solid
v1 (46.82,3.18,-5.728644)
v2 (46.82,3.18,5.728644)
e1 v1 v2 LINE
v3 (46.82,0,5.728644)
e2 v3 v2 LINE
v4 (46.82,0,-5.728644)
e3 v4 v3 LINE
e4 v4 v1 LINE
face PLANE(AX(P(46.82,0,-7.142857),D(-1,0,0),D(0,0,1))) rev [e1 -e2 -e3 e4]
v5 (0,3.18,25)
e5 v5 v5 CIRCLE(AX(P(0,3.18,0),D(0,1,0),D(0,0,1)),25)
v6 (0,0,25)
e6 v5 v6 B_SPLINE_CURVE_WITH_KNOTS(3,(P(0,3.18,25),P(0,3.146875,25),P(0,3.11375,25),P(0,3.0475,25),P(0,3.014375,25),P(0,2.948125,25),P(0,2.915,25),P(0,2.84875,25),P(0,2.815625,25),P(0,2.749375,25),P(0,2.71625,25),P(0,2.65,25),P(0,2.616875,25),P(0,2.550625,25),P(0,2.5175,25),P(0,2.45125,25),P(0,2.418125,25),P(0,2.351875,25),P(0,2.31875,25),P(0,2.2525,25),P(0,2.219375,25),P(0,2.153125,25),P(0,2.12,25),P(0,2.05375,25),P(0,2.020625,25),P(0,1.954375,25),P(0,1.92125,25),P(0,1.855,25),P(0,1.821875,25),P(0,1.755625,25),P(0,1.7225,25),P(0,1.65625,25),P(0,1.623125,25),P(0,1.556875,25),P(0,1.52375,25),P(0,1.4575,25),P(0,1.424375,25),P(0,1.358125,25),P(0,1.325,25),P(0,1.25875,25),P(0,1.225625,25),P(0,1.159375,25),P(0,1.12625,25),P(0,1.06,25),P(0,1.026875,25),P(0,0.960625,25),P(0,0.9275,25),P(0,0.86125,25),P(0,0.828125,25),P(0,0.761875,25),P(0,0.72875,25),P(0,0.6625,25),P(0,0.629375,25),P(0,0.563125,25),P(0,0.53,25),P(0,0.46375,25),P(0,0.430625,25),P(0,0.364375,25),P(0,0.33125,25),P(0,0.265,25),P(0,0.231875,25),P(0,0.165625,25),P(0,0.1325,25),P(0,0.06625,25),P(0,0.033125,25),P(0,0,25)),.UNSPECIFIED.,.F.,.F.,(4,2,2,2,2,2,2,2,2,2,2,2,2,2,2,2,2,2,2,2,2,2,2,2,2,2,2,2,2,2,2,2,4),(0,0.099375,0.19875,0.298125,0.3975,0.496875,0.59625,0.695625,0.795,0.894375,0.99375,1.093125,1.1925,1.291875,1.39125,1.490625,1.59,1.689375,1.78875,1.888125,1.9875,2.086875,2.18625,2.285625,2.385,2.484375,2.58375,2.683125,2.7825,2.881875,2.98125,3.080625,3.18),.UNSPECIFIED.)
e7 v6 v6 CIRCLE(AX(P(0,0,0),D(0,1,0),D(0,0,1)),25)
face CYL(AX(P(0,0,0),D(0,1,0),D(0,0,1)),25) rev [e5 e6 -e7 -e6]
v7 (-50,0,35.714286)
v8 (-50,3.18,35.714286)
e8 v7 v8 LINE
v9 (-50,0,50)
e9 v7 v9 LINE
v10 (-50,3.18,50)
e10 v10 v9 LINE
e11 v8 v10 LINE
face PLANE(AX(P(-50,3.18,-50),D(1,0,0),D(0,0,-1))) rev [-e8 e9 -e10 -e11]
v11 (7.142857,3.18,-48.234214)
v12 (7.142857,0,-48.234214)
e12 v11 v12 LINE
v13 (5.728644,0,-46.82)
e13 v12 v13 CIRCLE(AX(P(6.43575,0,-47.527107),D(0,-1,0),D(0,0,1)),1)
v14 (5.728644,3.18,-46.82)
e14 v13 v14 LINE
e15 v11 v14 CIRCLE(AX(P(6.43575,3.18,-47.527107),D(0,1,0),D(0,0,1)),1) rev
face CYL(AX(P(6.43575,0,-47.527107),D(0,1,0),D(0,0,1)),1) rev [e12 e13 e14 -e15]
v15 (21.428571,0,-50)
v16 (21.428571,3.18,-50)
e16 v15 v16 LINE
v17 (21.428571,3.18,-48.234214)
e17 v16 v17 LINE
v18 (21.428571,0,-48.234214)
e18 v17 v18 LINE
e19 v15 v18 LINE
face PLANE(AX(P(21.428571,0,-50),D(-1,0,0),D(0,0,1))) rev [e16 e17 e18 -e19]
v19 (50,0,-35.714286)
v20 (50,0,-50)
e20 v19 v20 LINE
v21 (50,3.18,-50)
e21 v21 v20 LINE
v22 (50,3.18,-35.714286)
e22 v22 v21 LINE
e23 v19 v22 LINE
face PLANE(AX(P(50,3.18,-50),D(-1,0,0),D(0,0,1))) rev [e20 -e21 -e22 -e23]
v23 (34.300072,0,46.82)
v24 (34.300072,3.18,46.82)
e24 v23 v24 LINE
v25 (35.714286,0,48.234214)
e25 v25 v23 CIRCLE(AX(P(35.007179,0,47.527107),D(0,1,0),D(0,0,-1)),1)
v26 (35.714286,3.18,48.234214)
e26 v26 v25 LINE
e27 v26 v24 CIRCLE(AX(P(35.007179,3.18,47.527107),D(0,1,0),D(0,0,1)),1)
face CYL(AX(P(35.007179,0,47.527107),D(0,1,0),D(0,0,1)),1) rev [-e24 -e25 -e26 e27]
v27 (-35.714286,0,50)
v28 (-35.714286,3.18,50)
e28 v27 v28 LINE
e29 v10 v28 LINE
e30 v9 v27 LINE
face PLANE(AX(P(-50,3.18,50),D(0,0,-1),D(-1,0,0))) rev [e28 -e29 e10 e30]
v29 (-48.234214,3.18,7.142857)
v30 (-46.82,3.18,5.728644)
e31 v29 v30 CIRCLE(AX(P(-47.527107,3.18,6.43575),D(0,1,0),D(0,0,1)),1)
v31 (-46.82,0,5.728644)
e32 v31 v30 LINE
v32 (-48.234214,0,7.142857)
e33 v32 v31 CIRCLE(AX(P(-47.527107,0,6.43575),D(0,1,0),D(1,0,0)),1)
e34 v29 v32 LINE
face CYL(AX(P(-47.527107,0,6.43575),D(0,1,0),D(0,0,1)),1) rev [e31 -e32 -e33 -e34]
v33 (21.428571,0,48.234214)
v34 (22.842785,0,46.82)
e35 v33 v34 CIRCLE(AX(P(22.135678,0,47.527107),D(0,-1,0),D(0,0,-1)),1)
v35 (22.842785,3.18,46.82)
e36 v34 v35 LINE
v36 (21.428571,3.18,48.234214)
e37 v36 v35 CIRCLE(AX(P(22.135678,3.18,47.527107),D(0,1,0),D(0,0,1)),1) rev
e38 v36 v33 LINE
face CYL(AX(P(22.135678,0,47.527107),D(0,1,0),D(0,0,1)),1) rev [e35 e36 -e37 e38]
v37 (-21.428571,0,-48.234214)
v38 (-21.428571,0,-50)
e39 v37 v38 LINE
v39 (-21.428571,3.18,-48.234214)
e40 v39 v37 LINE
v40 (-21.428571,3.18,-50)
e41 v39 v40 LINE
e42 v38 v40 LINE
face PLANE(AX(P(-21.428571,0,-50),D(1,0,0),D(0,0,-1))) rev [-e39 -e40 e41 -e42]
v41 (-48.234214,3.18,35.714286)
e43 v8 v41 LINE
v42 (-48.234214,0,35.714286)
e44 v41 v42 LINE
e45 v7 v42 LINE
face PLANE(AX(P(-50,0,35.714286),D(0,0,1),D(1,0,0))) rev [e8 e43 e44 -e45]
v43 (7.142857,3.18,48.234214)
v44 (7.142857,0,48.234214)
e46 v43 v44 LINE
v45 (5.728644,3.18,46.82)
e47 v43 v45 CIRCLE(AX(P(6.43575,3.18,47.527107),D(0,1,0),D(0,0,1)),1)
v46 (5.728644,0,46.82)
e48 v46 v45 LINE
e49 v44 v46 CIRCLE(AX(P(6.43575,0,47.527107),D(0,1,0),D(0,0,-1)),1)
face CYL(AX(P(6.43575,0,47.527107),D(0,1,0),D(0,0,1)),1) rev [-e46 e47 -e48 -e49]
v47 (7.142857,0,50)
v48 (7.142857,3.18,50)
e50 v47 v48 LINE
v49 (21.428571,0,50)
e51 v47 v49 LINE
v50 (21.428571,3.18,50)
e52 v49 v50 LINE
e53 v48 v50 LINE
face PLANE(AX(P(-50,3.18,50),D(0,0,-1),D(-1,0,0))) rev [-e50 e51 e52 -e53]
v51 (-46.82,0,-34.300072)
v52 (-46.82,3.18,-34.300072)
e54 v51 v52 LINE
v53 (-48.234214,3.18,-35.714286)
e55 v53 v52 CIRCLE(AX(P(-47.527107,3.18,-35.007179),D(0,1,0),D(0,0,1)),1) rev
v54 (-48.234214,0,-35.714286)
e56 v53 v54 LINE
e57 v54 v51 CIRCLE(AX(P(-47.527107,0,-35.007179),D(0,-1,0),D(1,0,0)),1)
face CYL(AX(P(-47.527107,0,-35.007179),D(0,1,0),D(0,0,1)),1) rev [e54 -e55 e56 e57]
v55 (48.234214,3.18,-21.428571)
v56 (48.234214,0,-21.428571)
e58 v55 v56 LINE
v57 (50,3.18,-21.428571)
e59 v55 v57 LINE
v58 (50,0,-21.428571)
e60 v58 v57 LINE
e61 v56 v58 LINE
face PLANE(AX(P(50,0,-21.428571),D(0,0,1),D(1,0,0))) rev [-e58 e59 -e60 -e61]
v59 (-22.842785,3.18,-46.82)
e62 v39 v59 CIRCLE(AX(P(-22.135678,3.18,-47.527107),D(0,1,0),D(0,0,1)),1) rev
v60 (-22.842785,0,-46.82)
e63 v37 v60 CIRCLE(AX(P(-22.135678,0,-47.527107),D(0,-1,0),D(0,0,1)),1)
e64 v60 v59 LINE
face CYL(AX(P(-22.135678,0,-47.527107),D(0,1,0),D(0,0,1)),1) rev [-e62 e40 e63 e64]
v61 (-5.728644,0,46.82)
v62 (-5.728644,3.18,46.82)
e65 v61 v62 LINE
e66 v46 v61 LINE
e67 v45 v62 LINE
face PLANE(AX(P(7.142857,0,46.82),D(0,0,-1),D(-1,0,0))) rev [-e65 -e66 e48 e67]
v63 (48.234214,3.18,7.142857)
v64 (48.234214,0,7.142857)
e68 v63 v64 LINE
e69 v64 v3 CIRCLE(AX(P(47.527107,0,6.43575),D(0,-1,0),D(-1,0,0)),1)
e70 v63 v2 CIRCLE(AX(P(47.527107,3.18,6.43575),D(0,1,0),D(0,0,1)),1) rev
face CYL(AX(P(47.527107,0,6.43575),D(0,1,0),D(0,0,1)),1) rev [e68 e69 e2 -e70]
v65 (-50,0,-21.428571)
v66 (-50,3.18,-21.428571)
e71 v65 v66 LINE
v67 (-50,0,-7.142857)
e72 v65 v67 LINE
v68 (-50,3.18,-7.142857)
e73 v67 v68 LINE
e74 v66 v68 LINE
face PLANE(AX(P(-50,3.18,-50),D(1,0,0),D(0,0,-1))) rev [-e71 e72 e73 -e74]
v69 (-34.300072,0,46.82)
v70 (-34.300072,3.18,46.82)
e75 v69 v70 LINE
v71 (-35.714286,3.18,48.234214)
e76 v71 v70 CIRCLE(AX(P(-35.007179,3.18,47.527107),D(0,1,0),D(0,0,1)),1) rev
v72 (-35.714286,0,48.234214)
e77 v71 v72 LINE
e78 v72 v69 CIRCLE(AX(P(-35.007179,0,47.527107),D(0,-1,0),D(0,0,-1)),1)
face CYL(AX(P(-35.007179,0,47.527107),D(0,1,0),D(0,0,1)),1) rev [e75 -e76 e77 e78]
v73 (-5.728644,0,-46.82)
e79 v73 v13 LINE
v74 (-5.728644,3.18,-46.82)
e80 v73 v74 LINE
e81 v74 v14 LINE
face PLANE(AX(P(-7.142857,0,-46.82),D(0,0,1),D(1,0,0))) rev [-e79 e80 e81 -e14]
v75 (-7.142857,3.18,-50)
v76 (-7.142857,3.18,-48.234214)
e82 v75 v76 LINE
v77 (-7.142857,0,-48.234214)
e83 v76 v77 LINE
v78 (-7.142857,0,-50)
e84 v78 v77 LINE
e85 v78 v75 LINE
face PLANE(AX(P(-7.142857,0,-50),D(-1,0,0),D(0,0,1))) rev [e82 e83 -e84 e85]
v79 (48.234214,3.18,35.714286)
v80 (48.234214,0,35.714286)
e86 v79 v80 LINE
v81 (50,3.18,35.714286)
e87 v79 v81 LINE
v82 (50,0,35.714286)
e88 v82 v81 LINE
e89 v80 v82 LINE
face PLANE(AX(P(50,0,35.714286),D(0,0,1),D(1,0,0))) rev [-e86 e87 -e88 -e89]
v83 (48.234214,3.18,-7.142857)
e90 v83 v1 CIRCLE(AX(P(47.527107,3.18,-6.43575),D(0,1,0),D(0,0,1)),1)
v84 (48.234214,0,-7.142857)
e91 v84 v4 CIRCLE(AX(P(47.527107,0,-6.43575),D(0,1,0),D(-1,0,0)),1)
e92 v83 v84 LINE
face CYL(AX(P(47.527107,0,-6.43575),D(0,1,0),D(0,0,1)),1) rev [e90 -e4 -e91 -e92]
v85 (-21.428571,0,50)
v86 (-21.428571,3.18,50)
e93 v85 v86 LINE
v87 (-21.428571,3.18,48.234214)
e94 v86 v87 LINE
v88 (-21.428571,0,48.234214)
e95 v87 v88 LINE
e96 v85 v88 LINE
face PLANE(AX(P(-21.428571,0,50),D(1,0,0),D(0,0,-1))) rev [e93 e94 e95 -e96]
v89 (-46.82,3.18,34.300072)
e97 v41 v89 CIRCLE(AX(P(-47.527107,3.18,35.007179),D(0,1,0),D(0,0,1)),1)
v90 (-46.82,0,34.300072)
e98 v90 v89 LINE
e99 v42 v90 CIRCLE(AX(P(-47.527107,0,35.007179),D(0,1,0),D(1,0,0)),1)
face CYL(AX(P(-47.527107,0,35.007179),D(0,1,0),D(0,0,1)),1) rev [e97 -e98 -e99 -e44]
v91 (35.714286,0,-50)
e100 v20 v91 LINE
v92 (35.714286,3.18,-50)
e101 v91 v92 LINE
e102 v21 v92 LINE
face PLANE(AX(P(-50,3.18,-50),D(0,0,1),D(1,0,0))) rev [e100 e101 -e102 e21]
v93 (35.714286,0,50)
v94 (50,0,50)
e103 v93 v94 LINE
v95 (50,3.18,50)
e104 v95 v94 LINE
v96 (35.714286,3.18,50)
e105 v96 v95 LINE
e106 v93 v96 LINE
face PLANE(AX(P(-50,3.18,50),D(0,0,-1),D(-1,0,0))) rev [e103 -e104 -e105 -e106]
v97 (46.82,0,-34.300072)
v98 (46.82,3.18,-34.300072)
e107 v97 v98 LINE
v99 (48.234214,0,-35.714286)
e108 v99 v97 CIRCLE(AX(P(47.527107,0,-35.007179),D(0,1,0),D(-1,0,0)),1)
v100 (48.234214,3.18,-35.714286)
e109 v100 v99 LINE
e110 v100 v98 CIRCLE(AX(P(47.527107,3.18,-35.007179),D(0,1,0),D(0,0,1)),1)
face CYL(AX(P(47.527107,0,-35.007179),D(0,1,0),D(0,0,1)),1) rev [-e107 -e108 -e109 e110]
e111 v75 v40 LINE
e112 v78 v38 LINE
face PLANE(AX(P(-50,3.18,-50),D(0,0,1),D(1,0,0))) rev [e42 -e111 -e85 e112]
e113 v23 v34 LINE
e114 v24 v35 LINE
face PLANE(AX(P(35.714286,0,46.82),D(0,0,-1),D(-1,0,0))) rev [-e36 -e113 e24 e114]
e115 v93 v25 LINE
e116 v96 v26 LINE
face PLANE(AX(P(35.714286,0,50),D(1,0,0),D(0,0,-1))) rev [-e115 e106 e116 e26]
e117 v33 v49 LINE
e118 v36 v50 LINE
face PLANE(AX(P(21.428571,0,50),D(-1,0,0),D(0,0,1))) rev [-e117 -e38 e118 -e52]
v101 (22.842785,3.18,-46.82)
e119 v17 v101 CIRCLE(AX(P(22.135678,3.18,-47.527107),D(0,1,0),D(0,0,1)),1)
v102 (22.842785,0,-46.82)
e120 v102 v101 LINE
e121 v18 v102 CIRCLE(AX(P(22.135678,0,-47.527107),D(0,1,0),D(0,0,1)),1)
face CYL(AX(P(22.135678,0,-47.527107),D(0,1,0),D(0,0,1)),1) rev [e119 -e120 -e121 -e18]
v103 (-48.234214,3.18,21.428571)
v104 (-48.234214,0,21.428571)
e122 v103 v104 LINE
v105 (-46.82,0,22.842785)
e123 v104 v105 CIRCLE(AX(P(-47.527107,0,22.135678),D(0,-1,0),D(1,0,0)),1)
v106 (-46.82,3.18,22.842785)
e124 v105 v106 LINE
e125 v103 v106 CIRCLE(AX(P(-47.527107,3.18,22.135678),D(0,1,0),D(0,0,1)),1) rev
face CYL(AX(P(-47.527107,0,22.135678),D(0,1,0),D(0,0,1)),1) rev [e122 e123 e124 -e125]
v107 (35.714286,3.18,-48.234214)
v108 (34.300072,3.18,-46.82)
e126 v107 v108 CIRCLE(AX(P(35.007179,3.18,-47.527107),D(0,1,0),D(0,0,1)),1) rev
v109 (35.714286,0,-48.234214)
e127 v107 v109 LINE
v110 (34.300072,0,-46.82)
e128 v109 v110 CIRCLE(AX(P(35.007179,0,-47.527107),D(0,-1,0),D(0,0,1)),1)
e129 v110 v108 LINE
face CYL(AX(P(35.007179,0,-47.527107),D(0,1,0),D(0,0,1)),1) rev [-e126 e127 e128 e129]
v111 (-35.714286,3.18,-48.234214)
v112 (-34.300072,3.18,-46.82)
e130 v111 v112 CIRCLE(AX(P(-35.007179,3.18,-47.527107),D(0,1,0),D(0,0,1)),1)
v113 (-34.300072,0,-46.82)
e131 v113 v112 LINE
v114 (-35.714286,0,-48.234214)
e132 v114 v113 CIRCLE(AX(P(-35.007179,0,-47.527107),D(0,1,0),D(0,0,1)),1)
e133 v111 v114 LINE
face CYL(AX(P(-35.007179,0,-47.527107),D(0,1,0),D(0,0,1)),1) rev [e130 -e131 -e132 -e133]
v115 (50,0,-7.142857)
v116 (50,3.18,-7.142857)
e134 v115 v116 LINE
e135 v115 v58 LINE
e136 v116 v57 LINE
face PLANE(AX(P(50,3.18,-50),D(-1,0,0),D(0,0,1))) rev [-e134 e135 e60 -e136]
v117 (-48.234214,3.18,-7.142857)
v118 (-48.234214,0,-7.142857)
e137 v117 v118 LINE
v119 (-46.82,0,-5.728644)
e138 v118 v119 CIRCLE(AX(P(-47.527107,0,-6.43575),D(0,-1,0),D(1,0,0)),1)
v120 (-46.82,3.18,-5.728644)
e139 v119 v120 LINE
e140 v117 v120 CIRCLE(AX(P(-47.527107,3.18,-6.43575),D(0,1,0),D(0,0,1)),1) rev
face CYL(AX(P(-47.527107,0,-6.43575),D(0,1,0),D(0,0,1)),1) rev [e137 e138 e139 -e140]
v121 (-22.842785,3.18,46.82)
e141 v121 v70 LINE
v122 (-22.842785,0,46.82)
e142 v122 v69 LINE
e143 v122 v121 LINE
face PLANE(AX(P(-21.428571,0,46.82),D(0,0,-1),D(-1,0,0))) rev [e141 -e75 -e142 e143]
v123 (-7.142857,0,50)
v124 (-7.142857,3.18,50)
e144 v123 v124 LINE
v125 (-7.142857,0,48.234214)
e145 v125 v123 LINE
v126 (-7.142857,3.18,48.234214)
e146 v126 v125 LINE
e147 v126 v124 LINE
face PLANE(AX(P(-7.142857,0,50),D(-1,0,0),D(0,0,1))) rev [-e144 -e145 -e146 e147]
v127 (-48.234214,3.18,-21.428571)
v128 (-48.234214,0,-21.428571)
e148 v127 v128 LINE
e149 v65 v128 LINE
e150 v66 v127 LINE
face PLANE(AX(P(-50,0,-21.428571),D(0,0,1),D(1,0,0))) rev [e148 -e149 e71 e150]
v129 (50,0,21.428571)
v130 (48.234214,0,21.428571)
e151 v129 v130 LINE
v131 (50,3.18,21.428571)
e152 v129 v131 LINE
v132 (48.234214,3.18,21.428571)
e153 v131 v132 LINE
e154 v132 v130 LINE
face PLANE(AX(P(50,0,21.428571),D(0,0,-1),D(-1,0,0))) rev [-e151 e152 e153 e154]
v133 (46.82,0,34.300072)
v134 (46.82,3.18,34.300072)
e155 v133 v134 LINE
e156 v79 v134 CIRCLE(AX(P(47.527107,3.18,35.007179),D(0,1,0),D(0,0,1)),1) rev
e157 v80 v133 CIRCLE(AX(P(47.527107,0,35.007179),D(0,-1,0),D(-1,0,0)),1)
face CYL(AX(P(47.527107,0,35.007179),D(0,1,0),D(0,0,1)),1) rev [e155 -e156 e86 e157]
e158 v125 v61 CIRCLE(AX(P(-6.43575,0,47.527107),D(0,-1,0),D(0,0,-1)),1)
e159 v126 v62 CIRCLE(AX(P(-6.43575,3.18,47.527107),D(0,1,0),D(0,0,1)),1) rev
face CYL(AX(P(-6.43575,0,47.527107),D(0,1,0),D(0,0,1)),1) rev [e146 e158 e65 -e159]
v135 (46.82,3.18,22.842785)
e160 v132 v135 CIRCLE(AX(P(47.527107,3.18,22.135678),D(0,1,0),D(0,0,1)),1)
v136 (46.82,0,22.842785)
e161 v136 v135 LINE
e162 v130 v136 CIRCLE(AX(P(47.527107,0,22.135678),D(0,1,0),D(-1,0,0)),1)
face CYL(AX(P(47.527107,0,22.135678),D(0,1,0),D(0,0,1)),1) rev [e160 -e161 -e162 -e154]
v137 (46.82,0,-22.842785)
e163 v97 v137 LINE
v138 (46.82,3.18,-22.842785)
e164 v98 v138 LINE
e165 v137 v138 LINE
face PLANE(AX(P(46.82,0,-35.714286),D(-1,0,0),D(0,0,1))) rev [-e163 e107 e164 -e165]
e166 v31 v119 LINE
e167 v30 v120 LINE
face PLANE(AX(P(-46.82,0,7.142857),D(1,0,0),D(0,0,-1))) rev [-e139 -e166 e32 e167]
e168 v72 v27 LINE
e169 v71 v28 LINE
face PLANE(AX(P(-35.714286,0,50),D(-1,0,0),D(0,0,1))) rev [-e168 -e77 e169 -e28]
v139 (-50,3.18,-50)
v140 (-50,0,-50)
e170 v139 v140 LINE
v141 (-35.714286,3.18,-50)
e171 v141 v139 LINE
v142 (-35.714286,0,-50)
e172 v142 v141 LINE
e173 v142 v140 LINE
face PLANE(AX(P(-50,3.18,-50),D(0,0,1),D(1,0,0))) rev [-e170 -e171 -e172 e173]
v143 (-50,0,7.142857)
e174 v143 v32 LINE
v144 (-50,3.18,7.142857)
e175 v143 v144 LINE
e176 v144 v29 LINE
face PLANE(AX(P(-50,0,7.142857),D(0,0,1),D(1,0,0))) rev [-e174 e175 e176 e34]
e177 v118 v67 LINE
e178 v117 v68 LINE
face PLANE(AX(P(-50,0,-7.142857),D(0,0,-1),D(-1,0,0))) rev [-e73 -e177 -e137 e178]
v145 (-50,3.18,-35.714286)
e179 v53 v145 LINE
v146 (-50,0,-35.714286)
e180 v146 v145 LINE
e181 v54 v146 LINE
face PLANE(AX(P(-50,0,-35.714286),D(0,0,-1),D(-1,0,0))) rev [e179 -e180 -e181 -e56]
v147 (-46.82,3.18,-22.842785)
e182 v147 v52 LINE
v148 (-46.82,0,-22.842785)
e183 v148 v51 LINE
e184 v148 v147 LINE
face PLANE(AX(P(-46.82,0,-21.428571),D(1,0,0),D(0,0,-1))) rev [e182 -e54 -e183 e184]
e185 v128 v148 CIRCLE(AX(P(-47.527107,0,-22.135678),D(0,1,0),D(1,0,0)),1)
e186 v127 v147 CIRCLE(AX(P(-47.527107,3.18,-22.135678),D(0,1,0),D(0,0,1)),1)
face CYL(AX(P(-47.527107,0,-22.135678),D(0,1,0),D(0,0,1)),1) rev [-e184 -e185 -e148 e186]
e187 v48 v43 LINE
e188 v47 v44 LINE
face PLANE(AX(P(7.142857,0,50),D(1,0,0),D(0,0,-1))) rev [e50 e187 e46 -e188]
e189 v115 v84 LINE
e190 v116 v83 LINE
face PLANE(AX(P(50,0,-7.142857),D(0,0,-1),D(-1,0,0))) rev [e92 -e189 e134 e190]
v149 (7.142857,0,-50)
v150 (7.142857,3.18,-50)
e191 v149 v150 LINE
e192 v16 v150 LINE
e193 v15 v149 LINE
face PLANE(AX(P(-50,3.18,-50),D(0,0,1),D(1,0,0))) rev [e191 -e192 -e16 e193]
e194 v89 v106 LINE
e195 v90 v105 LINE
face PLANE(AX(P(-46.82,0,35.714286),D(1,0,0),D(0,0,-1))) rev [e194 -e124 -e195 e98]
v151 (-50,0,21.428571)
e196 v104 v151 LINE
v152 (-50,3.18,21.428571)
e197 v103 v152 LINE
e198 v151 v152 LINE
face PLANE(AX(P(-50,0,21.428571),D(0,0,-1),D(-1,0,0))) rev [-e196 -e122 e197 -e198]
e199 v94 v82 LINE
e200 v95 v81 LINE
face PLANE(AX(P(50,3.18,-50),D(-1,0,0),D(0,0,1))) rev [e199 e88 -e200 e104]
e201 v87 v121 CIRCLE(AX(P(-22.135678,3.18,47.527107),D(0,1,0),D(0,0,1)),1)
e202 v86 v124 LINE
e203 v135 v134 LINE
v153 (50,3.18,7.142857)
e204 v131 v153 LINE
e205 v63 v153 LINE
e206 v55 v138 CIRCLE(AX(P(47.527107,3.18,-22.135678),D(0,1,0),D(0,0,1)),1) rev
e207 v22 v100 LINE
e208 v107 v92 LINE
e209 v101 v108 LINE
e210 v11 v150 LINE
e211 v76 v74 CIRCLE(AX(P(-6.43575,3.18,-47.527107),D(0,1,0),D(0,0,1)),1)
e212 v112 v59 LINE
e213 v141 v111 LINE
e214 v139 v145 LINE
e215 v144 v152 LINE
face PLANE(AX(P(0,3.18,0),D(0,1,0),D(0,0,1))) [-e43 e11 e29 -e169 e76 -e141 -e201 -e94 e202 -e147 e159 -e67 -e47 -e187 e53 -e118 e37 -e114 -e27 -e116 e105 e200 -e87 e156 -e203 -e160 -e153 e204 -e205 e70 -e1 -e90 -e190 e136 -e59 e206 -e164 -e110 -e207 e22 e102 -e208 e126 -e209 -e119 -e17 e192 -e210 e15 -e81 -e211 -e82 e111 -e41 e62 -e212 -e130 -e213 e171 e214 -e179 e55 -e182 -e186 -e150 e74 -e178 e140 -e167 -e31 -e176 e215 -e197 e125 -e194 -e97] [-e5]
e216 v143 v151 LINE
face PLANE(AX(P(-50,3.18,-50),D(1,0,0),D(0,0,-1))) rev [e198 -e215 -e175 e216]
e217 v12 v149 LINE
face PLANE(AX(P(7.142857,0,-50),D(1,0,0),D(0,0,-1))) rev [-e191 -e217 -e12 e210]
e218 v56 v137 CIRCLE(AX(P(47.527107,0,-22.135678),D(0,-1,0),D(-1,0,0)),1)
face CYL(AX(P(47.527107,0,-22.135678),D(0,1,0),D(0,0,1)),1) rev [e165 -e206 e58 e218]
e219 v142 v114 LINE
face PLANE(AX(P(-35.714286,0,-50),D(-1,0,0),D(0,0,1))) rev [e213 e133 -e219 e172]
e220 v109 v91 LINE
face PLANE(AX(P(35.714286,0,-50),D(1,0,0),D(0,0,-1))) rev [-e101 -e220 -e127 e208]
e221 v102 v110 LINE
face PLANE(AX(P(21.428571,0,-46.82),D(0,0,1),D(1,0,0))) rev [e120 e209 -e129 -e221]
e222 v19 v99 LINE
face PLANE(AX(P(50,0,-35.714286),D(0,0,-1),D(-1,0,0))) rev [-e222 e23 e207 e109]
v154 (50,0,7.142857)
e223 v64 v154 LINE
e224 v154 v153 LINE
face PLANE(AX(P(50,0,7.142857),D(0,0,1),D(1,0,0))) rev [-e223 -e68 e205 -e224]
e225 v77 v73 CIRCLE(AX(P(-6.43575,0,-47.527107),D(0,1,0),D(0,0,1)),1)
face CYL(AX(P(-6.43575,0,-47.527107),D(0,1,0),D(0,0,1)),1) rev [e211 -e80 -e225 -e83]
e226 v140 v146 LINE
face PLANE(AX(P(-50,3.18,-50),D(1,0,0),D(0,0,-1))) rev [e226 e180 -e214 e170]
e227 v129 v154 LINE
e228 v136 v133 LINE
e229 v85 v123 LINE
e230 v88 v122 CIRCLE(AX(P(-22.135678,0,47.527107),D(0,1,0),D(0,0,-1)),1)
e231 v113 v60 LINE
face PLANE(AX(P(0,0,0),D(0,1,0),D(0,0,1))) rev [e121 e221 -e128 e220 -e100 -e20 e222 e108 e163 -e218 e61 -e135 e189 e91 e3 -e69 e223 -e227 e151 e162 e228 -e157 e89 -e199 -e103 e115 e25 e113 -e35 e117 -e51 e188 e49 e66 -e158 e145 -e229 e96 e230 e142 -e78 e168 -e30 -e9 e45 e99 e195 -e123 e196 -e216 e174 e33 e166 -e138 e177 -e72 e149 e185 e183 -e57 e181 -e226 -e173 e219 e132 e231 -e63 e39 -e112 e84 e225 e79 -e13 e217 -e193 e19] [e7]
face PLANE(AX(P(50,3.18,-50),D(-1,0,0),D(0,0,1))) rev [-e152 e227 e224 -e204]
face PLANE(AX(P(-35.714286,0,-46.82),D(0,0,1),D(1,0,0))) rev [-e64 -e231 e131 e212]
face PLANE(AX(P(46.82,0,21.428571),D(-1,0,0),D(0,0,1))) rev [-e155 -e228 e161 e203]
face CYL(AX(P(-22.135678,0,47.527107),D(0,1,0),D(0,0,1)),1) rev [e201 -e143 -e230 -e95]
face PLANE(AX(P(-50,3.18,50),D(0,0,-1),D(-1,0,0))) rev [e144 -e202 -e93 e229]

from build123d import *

# Parameters (mm, degrees)
SKETCH1_W                   = 100
SKETCH1_H                   = 100
BOSS_EXTRUDE1_DEPTH         = 3.18
SKETCH2_W                   = 14.285714285
SKETCH2_H                   = 3.18
SKETCH2_W_2                 = 14.285714286
CUT_EXTRUDE1_DEPTH          = 71.782147467
SKETCH3_R                   = 1
CUT_EXTRUDE2_DEPTH          = 71.782147467
SKETCH_PATTERN1_DEPTH       = 3.18
CIRPATTERN1_COUNT           = 4
CIRPATTERN1_COPY_1_SKETCH_R = 1
CIRPATTERN1_COPY_1_DEPTH    = 71.782147467
CIRPATTERN1_COPY_2_SKETCH_R = 1
CIRPATTERN1_COPY_2_DEPTH    = 71.782147467
CIRPATTERN1_COPY_3_SKETCH_R = 1
CIRPATTERN1_COPY_3_DEPTH    = 71.782147467
CIRPATTERN1_COPY_4_DEPTH    = 3.18
CIRPATTERN1_COPY_5_DEPTH    = 3.18
CIRPATTERN1_COPY_6_DEPTH    = 3.18
CUT_EXTRUDE3_DEPTH          = 71.782147467
CUT_EXTRUDE3_DEPTH_BACK     = 71.782147467
SKETCH5_R                   = 25


# Read off the part's stored shape, not the designer's step: Sketch-Pattern1
with BuildPart() as part:
    # Sketch1 → Boss-Extrude1 (new body)
    with BuildSketch(Plane(origin=(0, 0, 0), x_dir=(1, 0, 0), z_dir=(0, 1, 0))):
        Rectangle(SKETCH1_W, SKETCH1_H)
    extrude(amount=BOSS_EXTRUDE1_DEPTH)

    # Sketch2 → Cut-Extrude1 (cut, symmetric)
    with BuildSketch(Plane(origin=(0, 3.18, 0), x_dir=(1, 0, 0), z_dir=(0, 1, 0))):
        with Locations((-28.571428572, 48.41)):
            Rectangle(SKETCH2_W, SKETCH2_H)
        with Locations((0, 48.41)):
            Rectangle(SKETCH2_W_2, SKETCH2_H)
        with Locations((28.571428572, 48.41)):
            Rectangle(SKETCH2_W, SKETCH2_H)
    cut_extrude1 = extrude(amount=CUT_EXTRUDE1_DEPTH, both=True, mode=Mode.SUBTRACT)

    # Sketch3 → Cut-Extrude2 (cut, symmetric)
    with BuildSketch(Plane(origin=(0, 3.18, 0), x_dir=(1, 0, 0), z_dir=(0, 1, 0))):
        with Locations((-35.007178933, 47.527106781)):
            Circle(SKETCH3_R)
    cut_extrude2 = extrude(amount=CUT_EXTRUDE2_DEPTH, both=True, mode=Mode.SUBTRACT)

    # Sketch-Pattern1 outline → Sketch-Pattern1 (cut)
    with BuildSketch(Plane(origin=(0, 0, 0), x_dir=(1, 0, 0), z_dir=(0, 1, 0))):
        with BuildLine():
            Line((-7.142857143, 46.82), (-7.142857143, 48.234213562))
            ThreePointArc((-7.142857143, 48.234213562), (-7.435750362, 47.527106781), (-7.142857143, 46.82))
        make_face()
        with BuildLine():
            Line((-5.72864358, 46.82), (-7.142857143, 46.82))
            ThreePointArc((-7.142857143, 46.82), (-6.435750362, 46.527106781), (-5.72864358, 46.82))
        make_face()
        with BuildLine():
            Line((21.428571429, 46.82), (21.428571429, 48.234213562))
            ThreePointArc((21.428571429, 48.234213562), (21.13567821, 47.527106781), (21.428571429, 46.82))
        make_face()
        with BuildLine():
            Line((22.842784991, 46.82), (21.428571429, 46.82))
            ThreePointArc((21.428571429, 46.82), (22.13567821, 46.527106781), (22.842784991, 46.82))
        make_face()
    sketch_pattern1 = extrude(amount=SKETCH_PATTERN1_DEPTH, mode=Mode.SUBTRACT)

    # Mirror1: Cut-Extrude2, Sketch-Pattern1 across plane
    add(cut_extrude2.mirror(Plane(origin=(0, 0, 0), x_dir=(0, 0, 1), z_dir=(1, 0, 0))), mode=Mode.SUBTRACT)
    add(sketch_pattern1.mirror(Plane(origin=(0, 0, 0), x_dir=(0, 0, 1), z_dir=(1, 0, 0))), mode=Mode.SUBTRACT)

    # CirPattern1: Cut-Extrude1, Cut-Extrude2, Sketch-Pattern1 ×4 about axis
    cirpattern1_axis = Axis((0, 0, 0), (0, 1, 0))
    add([cut_extrude1.rotate(cirpattern1_axis, i * 360 / CIRPATTERN1_COUNT) for i in range(1, CIRPATTERN1_COUNT)], mode=Mode.SUBTRACT)
    add([cut_extrude2.rotate(cirpattern1_axis, i * 360 / CIRPATTERN1_COUNT) for i in range(1, CIRPATTERN1_COUNT)], mode=Mode.SUBTRACT)
    add([sketch_pattern1.rotate(cirpattern1_axis, i * 360 / CIRPATTERN1_COUNT) for i in range(1, CIRPATTERN1_COUNT)], mode=Mode.SUBTRACT)

    # CirPattern1 copy 1 sketch → CirPattern1 copy 1 (cut, symmetric)
    with BuildSketch(Plane.ZX.offset(3.18)):
        with Locations((-35.007178933, -47.527106781)):
            Circle(CIRPATTERN1_COPY_1_SKETCH_R)
    extrude(amount=CIRPATTERN1_COPY_1_DEPTH, both=True, mode=Mode.SUBTRACT)

    # CirPattern1 copy 2 sketch → CirPattern1 copy 2 (cut, symmetric)
    with BuildSketch(Plane(origin=(0, 3.18, 0), x_dir=(1, 0, 0), z_dir=(0, 1, 0))):
        with Locations((-35.007178933, -47.527106781)):
            Circle(CIRPATTERN1_COPY_2_SKETCH_R)
    extrude(amount=CIRPATTERN1_COPY_2_DEPTH, both=True, mode=Mode.SUBTRACT)

    # CirPattern1 copy 3 sketch → CirPattern1 copy 3 (cut, symmetric)
    with BuildSketch(Plane(origin=(0, 3.18, 0), x_dir=(0, 0, -1), z_dir=(0, 1, 0))):
        with Locations((-35.007178933, -47.527106781)):
            Circle(CIRPATTERN1_COPY_3_SKETCH_R)
    extrude(amount=CIRPATTERN1_COPY_3_DEPTH, both=True, mode=Mode.SUBTRACT)

    # CirPattern1 copy 4 sketch → CirPattern1 copy 4 (cut)
    with BuildSketch(Plane.ZX):
        with BuildLine():
            Line((-7.142857143, -46.82), (-7.142857143, -48.234213562))
            ThreePointArc((-7.142857143, -48.234213562), (-7.435750362, -47.527106781), (-7.142857143, -46.82))
        make_face()
        with BuildLine():
            Line((-5.72864358, -46.82), (-7.142857143, -46.82))
            ThreePointArc((-7.142857143, -46.82), (-6.435750362, -46.527106781), (-5.72864358, -46.82))
        make_face()
        with BuildLine():
            Line((21.428571429, -46.82), (21.428571429, -48.234213562))
            ThreePointArc((21.428571429, -48.234213562), (21.13567821, -47.527106781), (21.428571429, -46.82))
        make_face()
        with BuildLine():
            Line((22.842784991, -46.82), (21.428571429, -46.82))
            ThreePointArc((21.428571429, -46.82), (22.13567821, -46.527106781), (22.842784991, -46.82))
        make_face()
    extrude(amount=CIRPATTERN1_COPY_4_DEPTH, mode=Mode.SUBTRACT)

    # CirPattern1 copy 5 sketch → CirPattern1 copy 5 (cut)
    with BuildSketch(Plane(origin=(0, 0, 0), x_dir=(1, 0, 0), z_dir=(0, 1, 0))):
        with BuildLine():
            Line((-7.142857143, -46.82), (-7.142857143, -48.234213562))
            ThreePointArc((-7.142857143, -48.234213562), (-7.435750362, -47.527106781), (-7.142857143, -46.82))
        make_face()
        with BuildLine():
            Line((-5.72864358, -46.82), (-7.142857143, -46.82))
            ThreePointArc((-7.142857143, -46.82), (-6.435750362, -46.527106781), (-5.72864358, -46.82))
        make_face()
        with BuildLine():
            Line((21.428571429, -46.82), (21.428571429, -48.234213562))
            ThreePointArc((21.428571429, -48.234213562), (21.13567821, -47.527106781), (21.428571429, -46.82))
        make_face()
        with BuildLine():
            Line((22.842784991, -46.82), (21.428571429, -46.82))
            ThreePointArc((21.428571429, -46.82), (22.13567821, -46.527106781), (22.842784991, -46.82))
        make_face()
    extrude(amount=CIRPATTERN1_COPY_5_DEPTH, mode=Mode.SUBTRACT)

    # CirPattern1 copy 6 sketch → CirPattern1 copy 6 (cut)
    with BuildSketch(Plane(origin=(0, 0, 0), x_dir=(0, 0, -1), z_dir=(0, 1, 0))):
        with BuildLine():
            Line((-7.142857143, -46.82), (-7.142857143, -48.234213562))
            ThreePointArc((-7.142857143, -48.234213562), (-7.435750362, -47.527106781), (-7.142857143, -46.82))
        make_face()
        with BuildLine():
            Line((-5.72864358, -46.82), (-7.142857143, -46.82))
            ThreePointArc((-7.142857143, -46.82), (-6.435750362, -46.527106781), (-5.72864358, -46.82))
        make_face()
        with BuildLine():
            Line((21.428571429, -46.82), (21.428571429, -48.234213562))
            ThreePointArc((21.428571429, -48.234213562), (21.13567821, -47.527106781), (21.428571429, -46.82))
        make_face()
        with BuildLine():
            Line((22.842784991, -46.82), (21.428571429, -46.82))
            ThreePointArc((21.428571429, -46.82), (22.13567821, -46.527106781), (22.842784991, -46.82))
        make_face()
    extrude(amount=CIRPATTERN1_COPY_6_DEPTH, mode=Mode.SUBTRACT)

    # Sketch5 → Cut-Extrude3 (cut, two sides: drawn at the far end of the back side and taken through both)
    with BuildSketch(Plane(origin=(0, 3.18, 0), x_dir=(1, 0, 0), z_dir=(0, 1, 0)).offset(-CUT_EXTRUDE3_DEPTH_BACK)):
        with Locations(Location((0, 0, 0), (0, 0, 270))):
            Circle(SKETCH5_R)
    extrude(amount=CUT_EXTRUDE3_DEPTH + CUT_EXTRUDE3_DEPTH_BACK, mode=Mode.SUBTRACT)


solid = part.part
